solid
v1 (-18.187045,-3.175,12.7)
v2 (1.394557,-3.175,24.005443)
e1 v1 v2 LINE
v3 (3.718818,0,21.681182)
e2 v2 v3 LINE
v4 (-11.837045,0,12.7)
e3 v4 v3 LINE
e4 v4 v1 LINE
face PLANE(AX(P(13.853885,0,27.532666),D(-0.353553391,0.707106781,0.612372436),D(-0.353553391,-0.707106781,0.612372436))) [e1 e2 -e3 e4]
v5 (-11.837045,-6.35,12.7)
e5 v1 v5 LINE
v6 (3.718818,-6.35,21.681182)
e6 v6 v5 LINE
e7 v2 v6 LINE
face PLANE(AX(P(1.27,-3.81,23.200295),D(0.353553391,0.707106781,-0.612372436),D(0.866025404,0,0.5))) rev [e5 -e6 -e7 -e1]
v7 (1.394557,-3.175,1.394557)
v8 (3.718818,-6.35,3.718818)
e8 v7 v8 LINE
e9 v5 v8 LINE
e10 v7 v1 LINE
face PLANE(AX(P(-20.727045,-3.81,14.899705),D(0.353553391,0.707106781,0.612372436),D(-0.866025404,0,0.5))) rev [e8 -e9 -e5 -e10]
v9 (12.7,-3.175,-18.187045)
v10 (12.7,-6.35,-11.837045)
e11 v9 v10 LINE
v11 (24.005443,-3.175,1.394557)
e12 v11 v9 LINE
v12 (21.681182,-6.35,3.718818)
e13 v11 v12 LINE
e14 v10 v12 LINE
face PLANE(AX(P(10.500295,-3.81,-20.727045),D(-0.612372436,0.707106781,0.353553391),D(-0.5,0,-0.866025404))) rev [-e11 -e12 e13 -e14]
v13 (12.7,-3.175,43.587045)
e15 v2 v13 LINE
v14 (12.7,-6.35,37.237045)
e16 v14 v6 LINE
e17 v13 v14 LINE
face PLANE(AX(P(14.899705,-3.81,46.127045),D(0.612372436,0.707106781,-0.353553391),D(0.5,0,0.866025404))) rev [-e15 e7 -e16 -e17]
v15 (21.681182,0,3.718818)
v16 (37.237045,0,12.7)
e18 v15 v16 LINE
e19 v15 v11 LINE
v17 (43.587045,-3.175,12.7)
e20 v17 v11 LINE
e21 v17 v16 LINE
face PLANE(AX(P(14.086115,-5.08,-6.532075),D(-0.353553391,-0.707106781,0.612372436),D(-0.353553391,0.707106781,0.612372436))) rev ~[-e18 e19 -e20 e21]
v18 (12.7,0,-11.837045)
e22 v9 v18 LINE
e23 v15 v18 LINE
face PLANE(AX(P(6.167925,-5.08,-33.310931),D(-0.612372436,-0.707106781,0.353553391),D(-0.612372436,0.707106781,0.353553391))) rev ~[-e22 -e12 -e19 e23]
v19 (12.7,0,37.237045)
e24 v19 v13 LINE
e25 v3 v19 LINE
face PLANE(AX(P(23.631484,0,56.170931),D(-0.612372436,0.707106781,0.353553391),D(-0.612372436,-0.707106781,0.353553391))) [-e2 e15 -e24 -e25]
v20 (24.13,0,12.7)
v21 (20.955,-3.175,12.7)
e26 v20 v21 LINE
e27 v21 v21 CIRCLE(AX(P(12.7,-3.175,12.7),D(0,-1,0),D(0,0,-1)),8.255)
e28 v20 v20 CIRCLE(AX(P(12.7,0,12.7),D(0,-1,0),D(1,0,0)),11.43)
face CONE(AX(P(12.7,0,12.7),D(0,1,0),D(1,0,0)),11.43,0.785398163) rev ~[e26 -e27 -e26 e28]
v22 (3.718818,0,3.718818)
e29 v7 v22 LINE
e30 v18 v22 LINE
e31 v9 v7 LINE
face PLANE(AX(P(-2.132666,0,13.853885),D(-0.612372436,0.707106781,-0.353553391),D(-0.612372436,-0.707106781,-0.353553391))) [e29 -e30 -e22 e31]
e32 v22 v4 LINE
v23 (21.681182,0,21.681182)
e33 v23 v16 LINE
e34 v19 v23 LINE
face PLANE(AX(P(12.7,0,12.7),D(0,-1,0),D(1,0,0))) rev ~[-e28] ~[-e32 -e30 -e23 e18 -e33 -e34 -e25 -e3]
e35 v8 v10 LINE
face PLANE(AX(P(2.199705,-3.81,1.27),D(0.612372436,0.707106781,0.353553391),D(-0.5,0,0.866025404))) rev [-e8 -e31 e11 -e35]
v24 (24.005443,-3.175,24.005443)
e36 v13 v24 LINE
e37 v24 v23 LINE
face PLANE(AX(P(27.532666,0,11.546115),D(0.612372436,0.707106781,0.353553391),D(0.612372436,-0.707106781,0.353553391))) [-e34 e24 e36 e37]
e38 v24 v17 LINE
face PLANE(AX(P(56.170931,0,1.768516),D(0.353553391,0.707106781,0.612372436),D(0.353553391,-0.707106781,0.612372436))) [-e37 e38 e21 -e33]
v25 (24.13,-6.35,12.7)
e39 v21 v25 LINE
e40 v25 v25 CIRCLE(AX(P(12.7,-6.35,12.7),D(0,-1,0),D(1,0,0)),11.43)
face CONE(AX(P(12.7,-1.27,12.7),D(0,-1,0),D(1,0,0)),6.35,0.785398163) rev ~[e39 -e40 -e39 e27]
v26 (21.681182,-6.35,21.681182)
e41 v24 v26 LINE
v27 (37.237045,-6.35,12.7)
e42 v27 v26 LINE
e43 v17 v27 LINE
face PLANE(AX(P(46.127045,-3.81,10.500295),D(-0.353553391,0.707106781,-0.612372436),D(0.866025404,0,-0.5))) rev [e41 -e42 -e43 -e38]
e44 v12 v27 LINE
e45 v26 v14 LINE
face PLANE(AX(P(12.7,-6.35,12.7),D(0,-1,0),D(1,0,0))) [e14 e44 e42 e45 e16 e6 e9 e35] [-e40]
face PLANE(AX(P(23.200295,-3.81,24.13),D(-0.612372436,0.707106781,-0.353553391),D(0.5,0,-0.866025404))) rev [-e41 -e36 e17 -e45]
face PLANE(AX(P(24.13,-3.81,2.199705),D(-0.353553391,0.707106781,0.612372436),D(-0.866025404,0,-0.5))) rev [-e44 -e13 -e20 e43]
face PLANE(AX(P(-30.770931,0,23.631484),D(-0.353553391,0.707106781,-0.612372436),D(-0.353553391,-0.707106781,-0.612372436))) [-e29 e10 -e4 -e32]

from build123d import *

# Parameters (mm, degrees)
F0_W         = 25.4
F0_H         = 25.4
F0_R         = 6.35
F1_DEPTH     = 6.35
F2_SIZE      = 5.08
F3_T4_DEPTH  = 51.5282991577
F3_T9_DEPTH  = 51.5282991577
F3_T14_DEPTH = 51.5282991577
F3_T19_DEPTH = 51.5282991577
F3_T24_DEPTH = 51.5282991577
F3_T29_DEPTH = 51.5282991577
F3_T34_DEPTH = 51.5282991577
F3_T39_DEPTH = 51.5282991577
F3_T47_DEPTH = 51.5282991577
F3_T51_DEPTH = 51.5282991577
F3_T58_DEPTH = 51.5282991577
F3_T62_DEPTH = 51.5282991577
F3_T69_DEPTH = 51.5282991577
F3_T73_DEPTH = 51.5282991577
F3_T80_DEPTH = 51.5282991577
F3_T84_DEPTH = 51.5282991577


# Not quite as in the source:
# - a fillet or chamfer that OpenCascade refuses, or shapes differently, is made with other operations: its cross-section is extruded or revolved along the edge and cut away or added


with BuildPart() as f1:
    # F0 (on Front) → F1 (new body)
    with BuildSketch(Plane.XZ):
        with Locations((12.7, 12.7)):
            Rectangle(F0_W, F0_H)
        with Locations((12.7, 12.7)):
            Circle(F0_R, mode=Mode.SUBTRACT)
        Polygon((12.7, 47.3970452561), (0, 25.4), (25.4, 25.4), align=None)
        Polygon((-21.9970452561, 12.7), (0, 0), (0, 25.4), align=None)
        Polygon((25.4, 25.4), (25.4, 0), (47.3970452561, 12.7), align=None)
        Polygon((25.4, 0), (0, 0), (12.7, -21.9970452561), align=None)
    extrude(amount=F1_DEPTH)

    # F2
    f2_edges = [f1.edges().sort_by_distance(p)[0] for p in [
        (36.398523, -6.35, 6.35),
        (36.398523, -6.35, 19.05),
        (19.05, -6.35, 36.398523),
        (6.35, -6.35, 36.398523),
        (-10.998523, -6.35, 19.05),
        (-10.998523, -6.35, 6.35),
        (6.35, -6.35, -10.998523),
        (19.05, -6.35, -10.998523),
        (6.35, -6.35, 12.7),
    ]]
    chamfer(f2_edges, length=F2_SIZE)

    # F3: chamfer of 5.08 on 9 edges, made by hand


with BuildPart() as f3_tool2:
    # F3_s3 → F3_t4 (new body)
    with BuildSketch(Plane(origin=(7.7361145859, 0, 4.4664478386), x_dir=(0, 1, 0), z_dir=(0.8660254038, 0, 0.5))):
        Polygon((-5.08, -12.7), (0, -7.62), (0, -12.7), align=None)
    extrude(amount=F3_T4_DEPTH)

    split(bisect_by=Plane(origin=(19.05, 0, -10.9985226281), x_dir=(0, 1, 0), z_dir=(0.8660254038, 0, -0.5)), keep=Keep.TOP)


with BuildPart() as f1_1:
    add(f1.part)

    # F3_t1: cut F3_tool2
    add(f3_tool2.part, mode=Mode.SUBTRACT)


with BuildPart() as f3_tool7:
    # F3_s8 → F3_t9 (new body)
    with BuildSketch(Plane(origin=(41.3624080422, 0, -23.8805974175), x_dir=(0, 1, 0), z_dir=(-0.8660254038, 0, 0.5))):
        Polygon((0, -29.6170452561), (-5.08, -34.6970452561), (0, -34.6970452561), align=None)
    extrude(amount=F3_T9_DEPTH)

    split(bisect_by=Plane(origin=(30.0485226281, 0, 17.3485226281), x_dir=(0, 1, 0), z_dir=(0.8660254038, 0, 0.5)), keep=Keep.TOP)


with BuildPart() as f1_2:
    add(f1_1.part)

    # F3_t6: cut F3_tool7
    add(f3_tool7.part, mode=Mode.SUBTRACT)


with BuildPart() as f3_tool12:
    # F3_s13 → F3_t14 (new body)
    with BuildSketch(Plane(origin=(1.8835521614, 0, -3.2624080422), x_dir=(0, 1, 0), z_dir=(-0.5, 0, 0.8660254038))):
        Polygon((0, -29.6170452561), (-5.08, -34.6970452561), (0, -34.6970452561), align=None)
    extrude(amount=F3_T14_DEPTH)

    split(bisect_by=Plane(origin=(17.3485226281, 0, 30.0485226281), x_dir=(0, 1, 0), z_dir=(0.5, 0, 0.8660254038)), keep=Keep.TOP)


with BuildPart() as f1_3:
    add(f1_2.part)

    # F3_t11: cut F3_tool12
    add(f3_tool12.part, mode=Mode.SUBTRACT)


with BuildPart() as f3_tool17:
    # F3_s18 → F3_t19 (new body)
    with BuildSketch(Plane(origin=(30.2305974175, 0, 52.3609306703), x_dir=(0, 1, 0), z_dir=(-0.5, 0, -0.8660254038))):
        Polygon((0, -7.62), (-5.08, -12.7), (0, -12.7), align=None)
    extrude(amount=F3_T19_DEPTH)

    split(bisect_by=Plane(origin=(-10.9985226281, 0, 19.05), x_dir=(0, 1, 0), z_dir=(-0.5, 0, 0.8660254038)), keep=Keep.TOP)


with BuildPart() as f1_4:
    add(f1_3.part)

    # F3_t16: cut F3_tool17
    add(f3_tool17.part, mode=Mode.SUBTRACT)


with BuildPart() as f3_tool22:
    # F3_s23 → F3_t24 (new body)
    with BuildSketch(Plane(origin=(22.3124080422, 0, 12.8820747894), x_dir=(0, 1, 0), z_dir=(-0.8660254038, 0, -0.5))):
        Polygon((0, -16.9170452561), (-5.08, -21.9970452561), (0, -21.9970452561), align=None)
    extrude(amount=F3_T24_DEPTH)

    split(bisect_by=Plane(origin=(-10.9985226281, 0, 6.35), x_dir=(0, 1, 0), z_dir=(-0.8660254038, 0, 0.5)), keep=Keep.TOP)


with BuildPart() as f1_5:
    add(f1_4.part)

    # F3_t21: cut F3_tool22
    add(f3_tool22.part, mode=Mode.SUBTRACT)


with BuildPart() as f3_tool27:
    # F3_s28 → F3_t29 (new body)
    with BuildSketch(Plane(origin=(-33.3109306703, 0, 19.2320747894), x_dir=(0, 1, 0), z_dir=(0.8660254038, 0, -0.5))):
        Polygon((0, 5.08), (-5.08, 0), (0, 0), align=None)
    extrude(amount=F3_T29_DEPTH)

    split(bisect_by=Plane(origin=(0, 0, 0), x_dir=(0, 1, 0), z_dir=(-0.8660254038, 0, -0.5)), keep=Keep.TOP)


with BuildPart() as f1_6:
    add(f1_5.part)

    # F3_t26: cut F3_tool27
    add(f3_tool27.part, mode=Mode.SUBTRACT)


with BuildPart() as f3_tool32:
    # F3_s33 → F3_t34 (new body)
    with BuildSketch(Plane(origin=(-6.5320747894, 0, 11.3138854141), x_dir=(0, 1, 0), z_dir=(0.5, 0, -0.8660254038))):
        Polygon((0, 5.08), (-5.08, 0), (0, 0), align=None)
    extrude(amount=F3_T34_DEPTH)

    split(bisect_by=Plane(origin=(0, 0, 0), x_dir=(0, 1, 0), z_dir=(-0.5, 0, -0.8660254038)), keep=Keep.TOP)


with BuildPart() as f1_7:
    add(f1_6.part)

    # F3_t31: cut F3_tool32
    add(f3_tool32.part, mode=Mode.SUBTRACT)


with BuildPart() as f3_tool37:
    # F3_s38 → F3_t39 (new body)
    with BuildSketch(Plane(origin=(-12.8820747894, 0, -22.3124080422), x_dir=(0, 1, 0), z_dir=(0.5, 0, 0.8660254038))):
        Polygon((-5.08, -21.9970452561), (0, -16.9170452561), (0, -21.9970452561), align=None)
    extrude(amount=F3_T39_DEPTH)

    split(bisect_by=Plane(origin=(6.35, 0, -10.9985226281), x_dir=(0, 1, 0), z_dir=(0.5, 0, -0.8660254038)), keep=Keep.TOP)


with BuildPart() as f1_8:
    add(f1_7.part)

    # F3_t36: cut F3_tool37
    add(f3_tool37.part, mode=Mode.SUBTRACT)

    # F3_s41 → F3_t42 (revolve, cut)
    with BuildSketch(Plane.XY.offset(12.7)):
        Polygon((24.13, 0), (19.05, -5.08), (19.05, 0), align=None)
    revolve(axis=Axis((12.7, 0, 12.7), (0, -1, 0)), mode=Mode.SUBTRACT)


with BuildPart() as f3_tool45:
    # F3_s46 → F3_t47 (new body)
    with BuildSketch(Plane(origin=(7.7361145859, 0, 4.4664478386), x_dir=(0, 1, 0), z_dir=(0.8660254038, 0, 0.5))):
        Polygon((-5.08, -12.7), (0, -7.62), (0, -12.7), align=None)
    extrude(amount=F3_T47_DEPTH)

    split(bisect_by=Plane(origin=(19.05, 0, -10.9985226281), x_dir=(0, 1, 0), z_dir=(-0.8660254038, 0, 0.5)), keep=Keep.TOP)


with BuildPart() as f3_tool49:
    # F3_s50 → F3_t51 (new body)
    with BuildSketch(Plane(origin=(-12.8820747894, 0, -22.3124080422), x_dir=(0, 1, 0), z_dir=(0.5, 0, 0.8660254038))):
        Polygon((-5.08, -21.9970452561), (0, -16.9170452561), (0, -21.9970452561), align=None)
    extrude(amount=F3_T51_DEPTH)

    split(bisect_by=Plane(origin=(6.35, 0, -10.9985226281), x_dir=(0, 1, 0), z_dir=(-0.5, 0, 0.8660254038)), keep=Keep.TOP)


with BuildPart() as f3_tool45_1:
    add(f3_tool45.part)

    # F3_t53: intersect F3_tool49
    add(f3_tool49.part, mode=Mode.INTERSECT)


with BuildPart() as f1_9:
    add(f1_8.part)

    # F3_t43: cut F3_tool45
    add(f3_tool45_1.part, mode=Mode.SUBTRACT)


with BuildPart() as f3_tool56:
    # F3_s57 → F3_t58 (new body)
    with BuildSketch(Plane(origin=(41.3624080422, 0, -23.8805974175), x_dir=(0, 1, 0), z_dir=(-0.8660254038, 0, 0.5))):
        Polygon((0, -29.6170452561), (-5.08, -34.6970452561), (0, -34.6970452561), align=None)
    extrude(amount=F3_T58_DEPTH)

    split(bisect_by=Plane(origin=(30.0485226281, 0, 17.3485226281), x_dir=(0, 1, 0), z_dir=(-0.8660254038, 0, -0.5)), keep=Keep.TOP)


with BuildPart() as f3_tool60:
    # F3_s61 → F3_t62 (new body)
    with BuildSketch(Plane(origin=(1.8835521614, 0, -3.2624080422), x_dir=(0, 1, 0), z_dir=(-0.5, 0, 0.8660254038))):
        Polygon((0, -29.6170452561), (-5.08, -34.6970452561), (0, -34.6970452561), align=None)
    extrude(amount=F3_T62_DEPTH)

    split(bisect_by=Plane(origin=(17.3485226281, 0, 30.0485226281), x_dir=(0, 1, 0), z_dir=(-0.5, 0, -0.8660254038)), keep=Keep.TOP)


with BuildPart() as f3_tool56_1:
    add(f3_tool56.part)

    # F3_t64: intersect F3_tool60
    add(f3_tool60.part, mode=Mode.INTERSECT)


with BuildPart() as f1_10:
    add(f1_9.part)

    # F3_t54: cut F3_tool56
    add(f3_tool56_1.part, mode=Mode.SUBTRACT)


with BuildPart() as f3_tool67:
    # F3_s68 → F3_t69 (new body)
    with BuildSketch(Plane(origin=(30.2305974175, 0, 52.3609306703), x_dir=(0, 1, 0), z_dir=(-0.5, 0, -0.8660254038))):
        Polygon((0, -7.62), (-5.08, -12.7), (0, -12.7), align=None)
    extrude(amount=F3_T69_DEPTH)

    split(bisect_by=Plane(origin=(-10.9985226281, 0, 19.05), x_dir=(0, 1, 0), z_dir=(0.5, 0, -0.8660254038)), keep=Keep.TOP)


with BuildPart() as f3_tool71:
    # F3_s72 → F3_t73 (new body)
    with BuildSketch(Plane(origin=(22.3124080422, 0, 12.8820747894), x_dir=(0, 1, 0), z_dir=(-0.8660254038, 0, -0.5))):
        Polygon((0, -16.9170452561), (-5.08, -21.9970452561), (0, -21.9970452561), align=None)
    extrude(amount=F3_T73_DEPTH)

    split(bisect_by=Plane(origin=(-10.9985226281, 0, 6.35), x_dir=(0, 1, 0), z_dir=(0.8660254038, 0, -0.5)), keep=Keep.TOP)


with BuildPart() as f3_tool67_1:
    add(f3_tool67.part)

    # F3_t75: intersect F3_tool71
    add(f3_tool71.part, mode=Mode.INTERSECT)


with BuildPart() as f1_11:
    add(f1_10.part)

    # F3_t65: cut F3_tool67
    add(f3_tool67_1.part, mode=Mode.SUBTRACT)


with BuildPart() as f3_tool78:
    # F3_s79 → F3_t80 (new body)
    with BuildSketch(Plane(origin=(-33.3109306703, 0, 19.2320747894), x_dir=(0, 1, 0), z_dir=(0.8660254038, 0, -0.5))):
        Polygon((0, 5.08), (-5.08, 0), (0, 0), align=None)
    extrude(amount=F3_T80_DEPTH)

    split(bisect_by=Plane(origin=(0, 0, 0), x_dir=(0, 1, 0), z_dir=(0.8660254038, 0, 0.5)), keep=Keep.TOP)


with BuildPart() as f3_tool82:
    # F3_s83 → F3_t84 (new body)
    with BuildSketch(Plane(origin=(-6.5320747894, 0, 11.3138854141), x_dir=(0, 1, 0), z_dir=(0.5, 0, -0.8660254038))):
        Polygon((0, 5.08), (-5.08, 0), (0, 0), align=None)
    extrude(amount=F3_T84_DEPTH)

    split(bisect_by=Plane(origin=(0, 0, 0), x_dir=(0, 1, 0), z_dir=(0.5, 0, 0.8660254038)), keep=Keep.TOP)


with BuildPart() as f3_tool78_1:
    add(f3_tool78.part)

    # F3_t86: intersect F3_tool82
    add(f3_tool82.part, mode=Mode.INTERSECT)


with BuildPart() as f1_12:
    add(f1_11.part)

    # F3_t76: cut F3_tool78
    add(f3_tool78_1.part, mode=Mode.SUBTRACT)


solid = f1_12.part
